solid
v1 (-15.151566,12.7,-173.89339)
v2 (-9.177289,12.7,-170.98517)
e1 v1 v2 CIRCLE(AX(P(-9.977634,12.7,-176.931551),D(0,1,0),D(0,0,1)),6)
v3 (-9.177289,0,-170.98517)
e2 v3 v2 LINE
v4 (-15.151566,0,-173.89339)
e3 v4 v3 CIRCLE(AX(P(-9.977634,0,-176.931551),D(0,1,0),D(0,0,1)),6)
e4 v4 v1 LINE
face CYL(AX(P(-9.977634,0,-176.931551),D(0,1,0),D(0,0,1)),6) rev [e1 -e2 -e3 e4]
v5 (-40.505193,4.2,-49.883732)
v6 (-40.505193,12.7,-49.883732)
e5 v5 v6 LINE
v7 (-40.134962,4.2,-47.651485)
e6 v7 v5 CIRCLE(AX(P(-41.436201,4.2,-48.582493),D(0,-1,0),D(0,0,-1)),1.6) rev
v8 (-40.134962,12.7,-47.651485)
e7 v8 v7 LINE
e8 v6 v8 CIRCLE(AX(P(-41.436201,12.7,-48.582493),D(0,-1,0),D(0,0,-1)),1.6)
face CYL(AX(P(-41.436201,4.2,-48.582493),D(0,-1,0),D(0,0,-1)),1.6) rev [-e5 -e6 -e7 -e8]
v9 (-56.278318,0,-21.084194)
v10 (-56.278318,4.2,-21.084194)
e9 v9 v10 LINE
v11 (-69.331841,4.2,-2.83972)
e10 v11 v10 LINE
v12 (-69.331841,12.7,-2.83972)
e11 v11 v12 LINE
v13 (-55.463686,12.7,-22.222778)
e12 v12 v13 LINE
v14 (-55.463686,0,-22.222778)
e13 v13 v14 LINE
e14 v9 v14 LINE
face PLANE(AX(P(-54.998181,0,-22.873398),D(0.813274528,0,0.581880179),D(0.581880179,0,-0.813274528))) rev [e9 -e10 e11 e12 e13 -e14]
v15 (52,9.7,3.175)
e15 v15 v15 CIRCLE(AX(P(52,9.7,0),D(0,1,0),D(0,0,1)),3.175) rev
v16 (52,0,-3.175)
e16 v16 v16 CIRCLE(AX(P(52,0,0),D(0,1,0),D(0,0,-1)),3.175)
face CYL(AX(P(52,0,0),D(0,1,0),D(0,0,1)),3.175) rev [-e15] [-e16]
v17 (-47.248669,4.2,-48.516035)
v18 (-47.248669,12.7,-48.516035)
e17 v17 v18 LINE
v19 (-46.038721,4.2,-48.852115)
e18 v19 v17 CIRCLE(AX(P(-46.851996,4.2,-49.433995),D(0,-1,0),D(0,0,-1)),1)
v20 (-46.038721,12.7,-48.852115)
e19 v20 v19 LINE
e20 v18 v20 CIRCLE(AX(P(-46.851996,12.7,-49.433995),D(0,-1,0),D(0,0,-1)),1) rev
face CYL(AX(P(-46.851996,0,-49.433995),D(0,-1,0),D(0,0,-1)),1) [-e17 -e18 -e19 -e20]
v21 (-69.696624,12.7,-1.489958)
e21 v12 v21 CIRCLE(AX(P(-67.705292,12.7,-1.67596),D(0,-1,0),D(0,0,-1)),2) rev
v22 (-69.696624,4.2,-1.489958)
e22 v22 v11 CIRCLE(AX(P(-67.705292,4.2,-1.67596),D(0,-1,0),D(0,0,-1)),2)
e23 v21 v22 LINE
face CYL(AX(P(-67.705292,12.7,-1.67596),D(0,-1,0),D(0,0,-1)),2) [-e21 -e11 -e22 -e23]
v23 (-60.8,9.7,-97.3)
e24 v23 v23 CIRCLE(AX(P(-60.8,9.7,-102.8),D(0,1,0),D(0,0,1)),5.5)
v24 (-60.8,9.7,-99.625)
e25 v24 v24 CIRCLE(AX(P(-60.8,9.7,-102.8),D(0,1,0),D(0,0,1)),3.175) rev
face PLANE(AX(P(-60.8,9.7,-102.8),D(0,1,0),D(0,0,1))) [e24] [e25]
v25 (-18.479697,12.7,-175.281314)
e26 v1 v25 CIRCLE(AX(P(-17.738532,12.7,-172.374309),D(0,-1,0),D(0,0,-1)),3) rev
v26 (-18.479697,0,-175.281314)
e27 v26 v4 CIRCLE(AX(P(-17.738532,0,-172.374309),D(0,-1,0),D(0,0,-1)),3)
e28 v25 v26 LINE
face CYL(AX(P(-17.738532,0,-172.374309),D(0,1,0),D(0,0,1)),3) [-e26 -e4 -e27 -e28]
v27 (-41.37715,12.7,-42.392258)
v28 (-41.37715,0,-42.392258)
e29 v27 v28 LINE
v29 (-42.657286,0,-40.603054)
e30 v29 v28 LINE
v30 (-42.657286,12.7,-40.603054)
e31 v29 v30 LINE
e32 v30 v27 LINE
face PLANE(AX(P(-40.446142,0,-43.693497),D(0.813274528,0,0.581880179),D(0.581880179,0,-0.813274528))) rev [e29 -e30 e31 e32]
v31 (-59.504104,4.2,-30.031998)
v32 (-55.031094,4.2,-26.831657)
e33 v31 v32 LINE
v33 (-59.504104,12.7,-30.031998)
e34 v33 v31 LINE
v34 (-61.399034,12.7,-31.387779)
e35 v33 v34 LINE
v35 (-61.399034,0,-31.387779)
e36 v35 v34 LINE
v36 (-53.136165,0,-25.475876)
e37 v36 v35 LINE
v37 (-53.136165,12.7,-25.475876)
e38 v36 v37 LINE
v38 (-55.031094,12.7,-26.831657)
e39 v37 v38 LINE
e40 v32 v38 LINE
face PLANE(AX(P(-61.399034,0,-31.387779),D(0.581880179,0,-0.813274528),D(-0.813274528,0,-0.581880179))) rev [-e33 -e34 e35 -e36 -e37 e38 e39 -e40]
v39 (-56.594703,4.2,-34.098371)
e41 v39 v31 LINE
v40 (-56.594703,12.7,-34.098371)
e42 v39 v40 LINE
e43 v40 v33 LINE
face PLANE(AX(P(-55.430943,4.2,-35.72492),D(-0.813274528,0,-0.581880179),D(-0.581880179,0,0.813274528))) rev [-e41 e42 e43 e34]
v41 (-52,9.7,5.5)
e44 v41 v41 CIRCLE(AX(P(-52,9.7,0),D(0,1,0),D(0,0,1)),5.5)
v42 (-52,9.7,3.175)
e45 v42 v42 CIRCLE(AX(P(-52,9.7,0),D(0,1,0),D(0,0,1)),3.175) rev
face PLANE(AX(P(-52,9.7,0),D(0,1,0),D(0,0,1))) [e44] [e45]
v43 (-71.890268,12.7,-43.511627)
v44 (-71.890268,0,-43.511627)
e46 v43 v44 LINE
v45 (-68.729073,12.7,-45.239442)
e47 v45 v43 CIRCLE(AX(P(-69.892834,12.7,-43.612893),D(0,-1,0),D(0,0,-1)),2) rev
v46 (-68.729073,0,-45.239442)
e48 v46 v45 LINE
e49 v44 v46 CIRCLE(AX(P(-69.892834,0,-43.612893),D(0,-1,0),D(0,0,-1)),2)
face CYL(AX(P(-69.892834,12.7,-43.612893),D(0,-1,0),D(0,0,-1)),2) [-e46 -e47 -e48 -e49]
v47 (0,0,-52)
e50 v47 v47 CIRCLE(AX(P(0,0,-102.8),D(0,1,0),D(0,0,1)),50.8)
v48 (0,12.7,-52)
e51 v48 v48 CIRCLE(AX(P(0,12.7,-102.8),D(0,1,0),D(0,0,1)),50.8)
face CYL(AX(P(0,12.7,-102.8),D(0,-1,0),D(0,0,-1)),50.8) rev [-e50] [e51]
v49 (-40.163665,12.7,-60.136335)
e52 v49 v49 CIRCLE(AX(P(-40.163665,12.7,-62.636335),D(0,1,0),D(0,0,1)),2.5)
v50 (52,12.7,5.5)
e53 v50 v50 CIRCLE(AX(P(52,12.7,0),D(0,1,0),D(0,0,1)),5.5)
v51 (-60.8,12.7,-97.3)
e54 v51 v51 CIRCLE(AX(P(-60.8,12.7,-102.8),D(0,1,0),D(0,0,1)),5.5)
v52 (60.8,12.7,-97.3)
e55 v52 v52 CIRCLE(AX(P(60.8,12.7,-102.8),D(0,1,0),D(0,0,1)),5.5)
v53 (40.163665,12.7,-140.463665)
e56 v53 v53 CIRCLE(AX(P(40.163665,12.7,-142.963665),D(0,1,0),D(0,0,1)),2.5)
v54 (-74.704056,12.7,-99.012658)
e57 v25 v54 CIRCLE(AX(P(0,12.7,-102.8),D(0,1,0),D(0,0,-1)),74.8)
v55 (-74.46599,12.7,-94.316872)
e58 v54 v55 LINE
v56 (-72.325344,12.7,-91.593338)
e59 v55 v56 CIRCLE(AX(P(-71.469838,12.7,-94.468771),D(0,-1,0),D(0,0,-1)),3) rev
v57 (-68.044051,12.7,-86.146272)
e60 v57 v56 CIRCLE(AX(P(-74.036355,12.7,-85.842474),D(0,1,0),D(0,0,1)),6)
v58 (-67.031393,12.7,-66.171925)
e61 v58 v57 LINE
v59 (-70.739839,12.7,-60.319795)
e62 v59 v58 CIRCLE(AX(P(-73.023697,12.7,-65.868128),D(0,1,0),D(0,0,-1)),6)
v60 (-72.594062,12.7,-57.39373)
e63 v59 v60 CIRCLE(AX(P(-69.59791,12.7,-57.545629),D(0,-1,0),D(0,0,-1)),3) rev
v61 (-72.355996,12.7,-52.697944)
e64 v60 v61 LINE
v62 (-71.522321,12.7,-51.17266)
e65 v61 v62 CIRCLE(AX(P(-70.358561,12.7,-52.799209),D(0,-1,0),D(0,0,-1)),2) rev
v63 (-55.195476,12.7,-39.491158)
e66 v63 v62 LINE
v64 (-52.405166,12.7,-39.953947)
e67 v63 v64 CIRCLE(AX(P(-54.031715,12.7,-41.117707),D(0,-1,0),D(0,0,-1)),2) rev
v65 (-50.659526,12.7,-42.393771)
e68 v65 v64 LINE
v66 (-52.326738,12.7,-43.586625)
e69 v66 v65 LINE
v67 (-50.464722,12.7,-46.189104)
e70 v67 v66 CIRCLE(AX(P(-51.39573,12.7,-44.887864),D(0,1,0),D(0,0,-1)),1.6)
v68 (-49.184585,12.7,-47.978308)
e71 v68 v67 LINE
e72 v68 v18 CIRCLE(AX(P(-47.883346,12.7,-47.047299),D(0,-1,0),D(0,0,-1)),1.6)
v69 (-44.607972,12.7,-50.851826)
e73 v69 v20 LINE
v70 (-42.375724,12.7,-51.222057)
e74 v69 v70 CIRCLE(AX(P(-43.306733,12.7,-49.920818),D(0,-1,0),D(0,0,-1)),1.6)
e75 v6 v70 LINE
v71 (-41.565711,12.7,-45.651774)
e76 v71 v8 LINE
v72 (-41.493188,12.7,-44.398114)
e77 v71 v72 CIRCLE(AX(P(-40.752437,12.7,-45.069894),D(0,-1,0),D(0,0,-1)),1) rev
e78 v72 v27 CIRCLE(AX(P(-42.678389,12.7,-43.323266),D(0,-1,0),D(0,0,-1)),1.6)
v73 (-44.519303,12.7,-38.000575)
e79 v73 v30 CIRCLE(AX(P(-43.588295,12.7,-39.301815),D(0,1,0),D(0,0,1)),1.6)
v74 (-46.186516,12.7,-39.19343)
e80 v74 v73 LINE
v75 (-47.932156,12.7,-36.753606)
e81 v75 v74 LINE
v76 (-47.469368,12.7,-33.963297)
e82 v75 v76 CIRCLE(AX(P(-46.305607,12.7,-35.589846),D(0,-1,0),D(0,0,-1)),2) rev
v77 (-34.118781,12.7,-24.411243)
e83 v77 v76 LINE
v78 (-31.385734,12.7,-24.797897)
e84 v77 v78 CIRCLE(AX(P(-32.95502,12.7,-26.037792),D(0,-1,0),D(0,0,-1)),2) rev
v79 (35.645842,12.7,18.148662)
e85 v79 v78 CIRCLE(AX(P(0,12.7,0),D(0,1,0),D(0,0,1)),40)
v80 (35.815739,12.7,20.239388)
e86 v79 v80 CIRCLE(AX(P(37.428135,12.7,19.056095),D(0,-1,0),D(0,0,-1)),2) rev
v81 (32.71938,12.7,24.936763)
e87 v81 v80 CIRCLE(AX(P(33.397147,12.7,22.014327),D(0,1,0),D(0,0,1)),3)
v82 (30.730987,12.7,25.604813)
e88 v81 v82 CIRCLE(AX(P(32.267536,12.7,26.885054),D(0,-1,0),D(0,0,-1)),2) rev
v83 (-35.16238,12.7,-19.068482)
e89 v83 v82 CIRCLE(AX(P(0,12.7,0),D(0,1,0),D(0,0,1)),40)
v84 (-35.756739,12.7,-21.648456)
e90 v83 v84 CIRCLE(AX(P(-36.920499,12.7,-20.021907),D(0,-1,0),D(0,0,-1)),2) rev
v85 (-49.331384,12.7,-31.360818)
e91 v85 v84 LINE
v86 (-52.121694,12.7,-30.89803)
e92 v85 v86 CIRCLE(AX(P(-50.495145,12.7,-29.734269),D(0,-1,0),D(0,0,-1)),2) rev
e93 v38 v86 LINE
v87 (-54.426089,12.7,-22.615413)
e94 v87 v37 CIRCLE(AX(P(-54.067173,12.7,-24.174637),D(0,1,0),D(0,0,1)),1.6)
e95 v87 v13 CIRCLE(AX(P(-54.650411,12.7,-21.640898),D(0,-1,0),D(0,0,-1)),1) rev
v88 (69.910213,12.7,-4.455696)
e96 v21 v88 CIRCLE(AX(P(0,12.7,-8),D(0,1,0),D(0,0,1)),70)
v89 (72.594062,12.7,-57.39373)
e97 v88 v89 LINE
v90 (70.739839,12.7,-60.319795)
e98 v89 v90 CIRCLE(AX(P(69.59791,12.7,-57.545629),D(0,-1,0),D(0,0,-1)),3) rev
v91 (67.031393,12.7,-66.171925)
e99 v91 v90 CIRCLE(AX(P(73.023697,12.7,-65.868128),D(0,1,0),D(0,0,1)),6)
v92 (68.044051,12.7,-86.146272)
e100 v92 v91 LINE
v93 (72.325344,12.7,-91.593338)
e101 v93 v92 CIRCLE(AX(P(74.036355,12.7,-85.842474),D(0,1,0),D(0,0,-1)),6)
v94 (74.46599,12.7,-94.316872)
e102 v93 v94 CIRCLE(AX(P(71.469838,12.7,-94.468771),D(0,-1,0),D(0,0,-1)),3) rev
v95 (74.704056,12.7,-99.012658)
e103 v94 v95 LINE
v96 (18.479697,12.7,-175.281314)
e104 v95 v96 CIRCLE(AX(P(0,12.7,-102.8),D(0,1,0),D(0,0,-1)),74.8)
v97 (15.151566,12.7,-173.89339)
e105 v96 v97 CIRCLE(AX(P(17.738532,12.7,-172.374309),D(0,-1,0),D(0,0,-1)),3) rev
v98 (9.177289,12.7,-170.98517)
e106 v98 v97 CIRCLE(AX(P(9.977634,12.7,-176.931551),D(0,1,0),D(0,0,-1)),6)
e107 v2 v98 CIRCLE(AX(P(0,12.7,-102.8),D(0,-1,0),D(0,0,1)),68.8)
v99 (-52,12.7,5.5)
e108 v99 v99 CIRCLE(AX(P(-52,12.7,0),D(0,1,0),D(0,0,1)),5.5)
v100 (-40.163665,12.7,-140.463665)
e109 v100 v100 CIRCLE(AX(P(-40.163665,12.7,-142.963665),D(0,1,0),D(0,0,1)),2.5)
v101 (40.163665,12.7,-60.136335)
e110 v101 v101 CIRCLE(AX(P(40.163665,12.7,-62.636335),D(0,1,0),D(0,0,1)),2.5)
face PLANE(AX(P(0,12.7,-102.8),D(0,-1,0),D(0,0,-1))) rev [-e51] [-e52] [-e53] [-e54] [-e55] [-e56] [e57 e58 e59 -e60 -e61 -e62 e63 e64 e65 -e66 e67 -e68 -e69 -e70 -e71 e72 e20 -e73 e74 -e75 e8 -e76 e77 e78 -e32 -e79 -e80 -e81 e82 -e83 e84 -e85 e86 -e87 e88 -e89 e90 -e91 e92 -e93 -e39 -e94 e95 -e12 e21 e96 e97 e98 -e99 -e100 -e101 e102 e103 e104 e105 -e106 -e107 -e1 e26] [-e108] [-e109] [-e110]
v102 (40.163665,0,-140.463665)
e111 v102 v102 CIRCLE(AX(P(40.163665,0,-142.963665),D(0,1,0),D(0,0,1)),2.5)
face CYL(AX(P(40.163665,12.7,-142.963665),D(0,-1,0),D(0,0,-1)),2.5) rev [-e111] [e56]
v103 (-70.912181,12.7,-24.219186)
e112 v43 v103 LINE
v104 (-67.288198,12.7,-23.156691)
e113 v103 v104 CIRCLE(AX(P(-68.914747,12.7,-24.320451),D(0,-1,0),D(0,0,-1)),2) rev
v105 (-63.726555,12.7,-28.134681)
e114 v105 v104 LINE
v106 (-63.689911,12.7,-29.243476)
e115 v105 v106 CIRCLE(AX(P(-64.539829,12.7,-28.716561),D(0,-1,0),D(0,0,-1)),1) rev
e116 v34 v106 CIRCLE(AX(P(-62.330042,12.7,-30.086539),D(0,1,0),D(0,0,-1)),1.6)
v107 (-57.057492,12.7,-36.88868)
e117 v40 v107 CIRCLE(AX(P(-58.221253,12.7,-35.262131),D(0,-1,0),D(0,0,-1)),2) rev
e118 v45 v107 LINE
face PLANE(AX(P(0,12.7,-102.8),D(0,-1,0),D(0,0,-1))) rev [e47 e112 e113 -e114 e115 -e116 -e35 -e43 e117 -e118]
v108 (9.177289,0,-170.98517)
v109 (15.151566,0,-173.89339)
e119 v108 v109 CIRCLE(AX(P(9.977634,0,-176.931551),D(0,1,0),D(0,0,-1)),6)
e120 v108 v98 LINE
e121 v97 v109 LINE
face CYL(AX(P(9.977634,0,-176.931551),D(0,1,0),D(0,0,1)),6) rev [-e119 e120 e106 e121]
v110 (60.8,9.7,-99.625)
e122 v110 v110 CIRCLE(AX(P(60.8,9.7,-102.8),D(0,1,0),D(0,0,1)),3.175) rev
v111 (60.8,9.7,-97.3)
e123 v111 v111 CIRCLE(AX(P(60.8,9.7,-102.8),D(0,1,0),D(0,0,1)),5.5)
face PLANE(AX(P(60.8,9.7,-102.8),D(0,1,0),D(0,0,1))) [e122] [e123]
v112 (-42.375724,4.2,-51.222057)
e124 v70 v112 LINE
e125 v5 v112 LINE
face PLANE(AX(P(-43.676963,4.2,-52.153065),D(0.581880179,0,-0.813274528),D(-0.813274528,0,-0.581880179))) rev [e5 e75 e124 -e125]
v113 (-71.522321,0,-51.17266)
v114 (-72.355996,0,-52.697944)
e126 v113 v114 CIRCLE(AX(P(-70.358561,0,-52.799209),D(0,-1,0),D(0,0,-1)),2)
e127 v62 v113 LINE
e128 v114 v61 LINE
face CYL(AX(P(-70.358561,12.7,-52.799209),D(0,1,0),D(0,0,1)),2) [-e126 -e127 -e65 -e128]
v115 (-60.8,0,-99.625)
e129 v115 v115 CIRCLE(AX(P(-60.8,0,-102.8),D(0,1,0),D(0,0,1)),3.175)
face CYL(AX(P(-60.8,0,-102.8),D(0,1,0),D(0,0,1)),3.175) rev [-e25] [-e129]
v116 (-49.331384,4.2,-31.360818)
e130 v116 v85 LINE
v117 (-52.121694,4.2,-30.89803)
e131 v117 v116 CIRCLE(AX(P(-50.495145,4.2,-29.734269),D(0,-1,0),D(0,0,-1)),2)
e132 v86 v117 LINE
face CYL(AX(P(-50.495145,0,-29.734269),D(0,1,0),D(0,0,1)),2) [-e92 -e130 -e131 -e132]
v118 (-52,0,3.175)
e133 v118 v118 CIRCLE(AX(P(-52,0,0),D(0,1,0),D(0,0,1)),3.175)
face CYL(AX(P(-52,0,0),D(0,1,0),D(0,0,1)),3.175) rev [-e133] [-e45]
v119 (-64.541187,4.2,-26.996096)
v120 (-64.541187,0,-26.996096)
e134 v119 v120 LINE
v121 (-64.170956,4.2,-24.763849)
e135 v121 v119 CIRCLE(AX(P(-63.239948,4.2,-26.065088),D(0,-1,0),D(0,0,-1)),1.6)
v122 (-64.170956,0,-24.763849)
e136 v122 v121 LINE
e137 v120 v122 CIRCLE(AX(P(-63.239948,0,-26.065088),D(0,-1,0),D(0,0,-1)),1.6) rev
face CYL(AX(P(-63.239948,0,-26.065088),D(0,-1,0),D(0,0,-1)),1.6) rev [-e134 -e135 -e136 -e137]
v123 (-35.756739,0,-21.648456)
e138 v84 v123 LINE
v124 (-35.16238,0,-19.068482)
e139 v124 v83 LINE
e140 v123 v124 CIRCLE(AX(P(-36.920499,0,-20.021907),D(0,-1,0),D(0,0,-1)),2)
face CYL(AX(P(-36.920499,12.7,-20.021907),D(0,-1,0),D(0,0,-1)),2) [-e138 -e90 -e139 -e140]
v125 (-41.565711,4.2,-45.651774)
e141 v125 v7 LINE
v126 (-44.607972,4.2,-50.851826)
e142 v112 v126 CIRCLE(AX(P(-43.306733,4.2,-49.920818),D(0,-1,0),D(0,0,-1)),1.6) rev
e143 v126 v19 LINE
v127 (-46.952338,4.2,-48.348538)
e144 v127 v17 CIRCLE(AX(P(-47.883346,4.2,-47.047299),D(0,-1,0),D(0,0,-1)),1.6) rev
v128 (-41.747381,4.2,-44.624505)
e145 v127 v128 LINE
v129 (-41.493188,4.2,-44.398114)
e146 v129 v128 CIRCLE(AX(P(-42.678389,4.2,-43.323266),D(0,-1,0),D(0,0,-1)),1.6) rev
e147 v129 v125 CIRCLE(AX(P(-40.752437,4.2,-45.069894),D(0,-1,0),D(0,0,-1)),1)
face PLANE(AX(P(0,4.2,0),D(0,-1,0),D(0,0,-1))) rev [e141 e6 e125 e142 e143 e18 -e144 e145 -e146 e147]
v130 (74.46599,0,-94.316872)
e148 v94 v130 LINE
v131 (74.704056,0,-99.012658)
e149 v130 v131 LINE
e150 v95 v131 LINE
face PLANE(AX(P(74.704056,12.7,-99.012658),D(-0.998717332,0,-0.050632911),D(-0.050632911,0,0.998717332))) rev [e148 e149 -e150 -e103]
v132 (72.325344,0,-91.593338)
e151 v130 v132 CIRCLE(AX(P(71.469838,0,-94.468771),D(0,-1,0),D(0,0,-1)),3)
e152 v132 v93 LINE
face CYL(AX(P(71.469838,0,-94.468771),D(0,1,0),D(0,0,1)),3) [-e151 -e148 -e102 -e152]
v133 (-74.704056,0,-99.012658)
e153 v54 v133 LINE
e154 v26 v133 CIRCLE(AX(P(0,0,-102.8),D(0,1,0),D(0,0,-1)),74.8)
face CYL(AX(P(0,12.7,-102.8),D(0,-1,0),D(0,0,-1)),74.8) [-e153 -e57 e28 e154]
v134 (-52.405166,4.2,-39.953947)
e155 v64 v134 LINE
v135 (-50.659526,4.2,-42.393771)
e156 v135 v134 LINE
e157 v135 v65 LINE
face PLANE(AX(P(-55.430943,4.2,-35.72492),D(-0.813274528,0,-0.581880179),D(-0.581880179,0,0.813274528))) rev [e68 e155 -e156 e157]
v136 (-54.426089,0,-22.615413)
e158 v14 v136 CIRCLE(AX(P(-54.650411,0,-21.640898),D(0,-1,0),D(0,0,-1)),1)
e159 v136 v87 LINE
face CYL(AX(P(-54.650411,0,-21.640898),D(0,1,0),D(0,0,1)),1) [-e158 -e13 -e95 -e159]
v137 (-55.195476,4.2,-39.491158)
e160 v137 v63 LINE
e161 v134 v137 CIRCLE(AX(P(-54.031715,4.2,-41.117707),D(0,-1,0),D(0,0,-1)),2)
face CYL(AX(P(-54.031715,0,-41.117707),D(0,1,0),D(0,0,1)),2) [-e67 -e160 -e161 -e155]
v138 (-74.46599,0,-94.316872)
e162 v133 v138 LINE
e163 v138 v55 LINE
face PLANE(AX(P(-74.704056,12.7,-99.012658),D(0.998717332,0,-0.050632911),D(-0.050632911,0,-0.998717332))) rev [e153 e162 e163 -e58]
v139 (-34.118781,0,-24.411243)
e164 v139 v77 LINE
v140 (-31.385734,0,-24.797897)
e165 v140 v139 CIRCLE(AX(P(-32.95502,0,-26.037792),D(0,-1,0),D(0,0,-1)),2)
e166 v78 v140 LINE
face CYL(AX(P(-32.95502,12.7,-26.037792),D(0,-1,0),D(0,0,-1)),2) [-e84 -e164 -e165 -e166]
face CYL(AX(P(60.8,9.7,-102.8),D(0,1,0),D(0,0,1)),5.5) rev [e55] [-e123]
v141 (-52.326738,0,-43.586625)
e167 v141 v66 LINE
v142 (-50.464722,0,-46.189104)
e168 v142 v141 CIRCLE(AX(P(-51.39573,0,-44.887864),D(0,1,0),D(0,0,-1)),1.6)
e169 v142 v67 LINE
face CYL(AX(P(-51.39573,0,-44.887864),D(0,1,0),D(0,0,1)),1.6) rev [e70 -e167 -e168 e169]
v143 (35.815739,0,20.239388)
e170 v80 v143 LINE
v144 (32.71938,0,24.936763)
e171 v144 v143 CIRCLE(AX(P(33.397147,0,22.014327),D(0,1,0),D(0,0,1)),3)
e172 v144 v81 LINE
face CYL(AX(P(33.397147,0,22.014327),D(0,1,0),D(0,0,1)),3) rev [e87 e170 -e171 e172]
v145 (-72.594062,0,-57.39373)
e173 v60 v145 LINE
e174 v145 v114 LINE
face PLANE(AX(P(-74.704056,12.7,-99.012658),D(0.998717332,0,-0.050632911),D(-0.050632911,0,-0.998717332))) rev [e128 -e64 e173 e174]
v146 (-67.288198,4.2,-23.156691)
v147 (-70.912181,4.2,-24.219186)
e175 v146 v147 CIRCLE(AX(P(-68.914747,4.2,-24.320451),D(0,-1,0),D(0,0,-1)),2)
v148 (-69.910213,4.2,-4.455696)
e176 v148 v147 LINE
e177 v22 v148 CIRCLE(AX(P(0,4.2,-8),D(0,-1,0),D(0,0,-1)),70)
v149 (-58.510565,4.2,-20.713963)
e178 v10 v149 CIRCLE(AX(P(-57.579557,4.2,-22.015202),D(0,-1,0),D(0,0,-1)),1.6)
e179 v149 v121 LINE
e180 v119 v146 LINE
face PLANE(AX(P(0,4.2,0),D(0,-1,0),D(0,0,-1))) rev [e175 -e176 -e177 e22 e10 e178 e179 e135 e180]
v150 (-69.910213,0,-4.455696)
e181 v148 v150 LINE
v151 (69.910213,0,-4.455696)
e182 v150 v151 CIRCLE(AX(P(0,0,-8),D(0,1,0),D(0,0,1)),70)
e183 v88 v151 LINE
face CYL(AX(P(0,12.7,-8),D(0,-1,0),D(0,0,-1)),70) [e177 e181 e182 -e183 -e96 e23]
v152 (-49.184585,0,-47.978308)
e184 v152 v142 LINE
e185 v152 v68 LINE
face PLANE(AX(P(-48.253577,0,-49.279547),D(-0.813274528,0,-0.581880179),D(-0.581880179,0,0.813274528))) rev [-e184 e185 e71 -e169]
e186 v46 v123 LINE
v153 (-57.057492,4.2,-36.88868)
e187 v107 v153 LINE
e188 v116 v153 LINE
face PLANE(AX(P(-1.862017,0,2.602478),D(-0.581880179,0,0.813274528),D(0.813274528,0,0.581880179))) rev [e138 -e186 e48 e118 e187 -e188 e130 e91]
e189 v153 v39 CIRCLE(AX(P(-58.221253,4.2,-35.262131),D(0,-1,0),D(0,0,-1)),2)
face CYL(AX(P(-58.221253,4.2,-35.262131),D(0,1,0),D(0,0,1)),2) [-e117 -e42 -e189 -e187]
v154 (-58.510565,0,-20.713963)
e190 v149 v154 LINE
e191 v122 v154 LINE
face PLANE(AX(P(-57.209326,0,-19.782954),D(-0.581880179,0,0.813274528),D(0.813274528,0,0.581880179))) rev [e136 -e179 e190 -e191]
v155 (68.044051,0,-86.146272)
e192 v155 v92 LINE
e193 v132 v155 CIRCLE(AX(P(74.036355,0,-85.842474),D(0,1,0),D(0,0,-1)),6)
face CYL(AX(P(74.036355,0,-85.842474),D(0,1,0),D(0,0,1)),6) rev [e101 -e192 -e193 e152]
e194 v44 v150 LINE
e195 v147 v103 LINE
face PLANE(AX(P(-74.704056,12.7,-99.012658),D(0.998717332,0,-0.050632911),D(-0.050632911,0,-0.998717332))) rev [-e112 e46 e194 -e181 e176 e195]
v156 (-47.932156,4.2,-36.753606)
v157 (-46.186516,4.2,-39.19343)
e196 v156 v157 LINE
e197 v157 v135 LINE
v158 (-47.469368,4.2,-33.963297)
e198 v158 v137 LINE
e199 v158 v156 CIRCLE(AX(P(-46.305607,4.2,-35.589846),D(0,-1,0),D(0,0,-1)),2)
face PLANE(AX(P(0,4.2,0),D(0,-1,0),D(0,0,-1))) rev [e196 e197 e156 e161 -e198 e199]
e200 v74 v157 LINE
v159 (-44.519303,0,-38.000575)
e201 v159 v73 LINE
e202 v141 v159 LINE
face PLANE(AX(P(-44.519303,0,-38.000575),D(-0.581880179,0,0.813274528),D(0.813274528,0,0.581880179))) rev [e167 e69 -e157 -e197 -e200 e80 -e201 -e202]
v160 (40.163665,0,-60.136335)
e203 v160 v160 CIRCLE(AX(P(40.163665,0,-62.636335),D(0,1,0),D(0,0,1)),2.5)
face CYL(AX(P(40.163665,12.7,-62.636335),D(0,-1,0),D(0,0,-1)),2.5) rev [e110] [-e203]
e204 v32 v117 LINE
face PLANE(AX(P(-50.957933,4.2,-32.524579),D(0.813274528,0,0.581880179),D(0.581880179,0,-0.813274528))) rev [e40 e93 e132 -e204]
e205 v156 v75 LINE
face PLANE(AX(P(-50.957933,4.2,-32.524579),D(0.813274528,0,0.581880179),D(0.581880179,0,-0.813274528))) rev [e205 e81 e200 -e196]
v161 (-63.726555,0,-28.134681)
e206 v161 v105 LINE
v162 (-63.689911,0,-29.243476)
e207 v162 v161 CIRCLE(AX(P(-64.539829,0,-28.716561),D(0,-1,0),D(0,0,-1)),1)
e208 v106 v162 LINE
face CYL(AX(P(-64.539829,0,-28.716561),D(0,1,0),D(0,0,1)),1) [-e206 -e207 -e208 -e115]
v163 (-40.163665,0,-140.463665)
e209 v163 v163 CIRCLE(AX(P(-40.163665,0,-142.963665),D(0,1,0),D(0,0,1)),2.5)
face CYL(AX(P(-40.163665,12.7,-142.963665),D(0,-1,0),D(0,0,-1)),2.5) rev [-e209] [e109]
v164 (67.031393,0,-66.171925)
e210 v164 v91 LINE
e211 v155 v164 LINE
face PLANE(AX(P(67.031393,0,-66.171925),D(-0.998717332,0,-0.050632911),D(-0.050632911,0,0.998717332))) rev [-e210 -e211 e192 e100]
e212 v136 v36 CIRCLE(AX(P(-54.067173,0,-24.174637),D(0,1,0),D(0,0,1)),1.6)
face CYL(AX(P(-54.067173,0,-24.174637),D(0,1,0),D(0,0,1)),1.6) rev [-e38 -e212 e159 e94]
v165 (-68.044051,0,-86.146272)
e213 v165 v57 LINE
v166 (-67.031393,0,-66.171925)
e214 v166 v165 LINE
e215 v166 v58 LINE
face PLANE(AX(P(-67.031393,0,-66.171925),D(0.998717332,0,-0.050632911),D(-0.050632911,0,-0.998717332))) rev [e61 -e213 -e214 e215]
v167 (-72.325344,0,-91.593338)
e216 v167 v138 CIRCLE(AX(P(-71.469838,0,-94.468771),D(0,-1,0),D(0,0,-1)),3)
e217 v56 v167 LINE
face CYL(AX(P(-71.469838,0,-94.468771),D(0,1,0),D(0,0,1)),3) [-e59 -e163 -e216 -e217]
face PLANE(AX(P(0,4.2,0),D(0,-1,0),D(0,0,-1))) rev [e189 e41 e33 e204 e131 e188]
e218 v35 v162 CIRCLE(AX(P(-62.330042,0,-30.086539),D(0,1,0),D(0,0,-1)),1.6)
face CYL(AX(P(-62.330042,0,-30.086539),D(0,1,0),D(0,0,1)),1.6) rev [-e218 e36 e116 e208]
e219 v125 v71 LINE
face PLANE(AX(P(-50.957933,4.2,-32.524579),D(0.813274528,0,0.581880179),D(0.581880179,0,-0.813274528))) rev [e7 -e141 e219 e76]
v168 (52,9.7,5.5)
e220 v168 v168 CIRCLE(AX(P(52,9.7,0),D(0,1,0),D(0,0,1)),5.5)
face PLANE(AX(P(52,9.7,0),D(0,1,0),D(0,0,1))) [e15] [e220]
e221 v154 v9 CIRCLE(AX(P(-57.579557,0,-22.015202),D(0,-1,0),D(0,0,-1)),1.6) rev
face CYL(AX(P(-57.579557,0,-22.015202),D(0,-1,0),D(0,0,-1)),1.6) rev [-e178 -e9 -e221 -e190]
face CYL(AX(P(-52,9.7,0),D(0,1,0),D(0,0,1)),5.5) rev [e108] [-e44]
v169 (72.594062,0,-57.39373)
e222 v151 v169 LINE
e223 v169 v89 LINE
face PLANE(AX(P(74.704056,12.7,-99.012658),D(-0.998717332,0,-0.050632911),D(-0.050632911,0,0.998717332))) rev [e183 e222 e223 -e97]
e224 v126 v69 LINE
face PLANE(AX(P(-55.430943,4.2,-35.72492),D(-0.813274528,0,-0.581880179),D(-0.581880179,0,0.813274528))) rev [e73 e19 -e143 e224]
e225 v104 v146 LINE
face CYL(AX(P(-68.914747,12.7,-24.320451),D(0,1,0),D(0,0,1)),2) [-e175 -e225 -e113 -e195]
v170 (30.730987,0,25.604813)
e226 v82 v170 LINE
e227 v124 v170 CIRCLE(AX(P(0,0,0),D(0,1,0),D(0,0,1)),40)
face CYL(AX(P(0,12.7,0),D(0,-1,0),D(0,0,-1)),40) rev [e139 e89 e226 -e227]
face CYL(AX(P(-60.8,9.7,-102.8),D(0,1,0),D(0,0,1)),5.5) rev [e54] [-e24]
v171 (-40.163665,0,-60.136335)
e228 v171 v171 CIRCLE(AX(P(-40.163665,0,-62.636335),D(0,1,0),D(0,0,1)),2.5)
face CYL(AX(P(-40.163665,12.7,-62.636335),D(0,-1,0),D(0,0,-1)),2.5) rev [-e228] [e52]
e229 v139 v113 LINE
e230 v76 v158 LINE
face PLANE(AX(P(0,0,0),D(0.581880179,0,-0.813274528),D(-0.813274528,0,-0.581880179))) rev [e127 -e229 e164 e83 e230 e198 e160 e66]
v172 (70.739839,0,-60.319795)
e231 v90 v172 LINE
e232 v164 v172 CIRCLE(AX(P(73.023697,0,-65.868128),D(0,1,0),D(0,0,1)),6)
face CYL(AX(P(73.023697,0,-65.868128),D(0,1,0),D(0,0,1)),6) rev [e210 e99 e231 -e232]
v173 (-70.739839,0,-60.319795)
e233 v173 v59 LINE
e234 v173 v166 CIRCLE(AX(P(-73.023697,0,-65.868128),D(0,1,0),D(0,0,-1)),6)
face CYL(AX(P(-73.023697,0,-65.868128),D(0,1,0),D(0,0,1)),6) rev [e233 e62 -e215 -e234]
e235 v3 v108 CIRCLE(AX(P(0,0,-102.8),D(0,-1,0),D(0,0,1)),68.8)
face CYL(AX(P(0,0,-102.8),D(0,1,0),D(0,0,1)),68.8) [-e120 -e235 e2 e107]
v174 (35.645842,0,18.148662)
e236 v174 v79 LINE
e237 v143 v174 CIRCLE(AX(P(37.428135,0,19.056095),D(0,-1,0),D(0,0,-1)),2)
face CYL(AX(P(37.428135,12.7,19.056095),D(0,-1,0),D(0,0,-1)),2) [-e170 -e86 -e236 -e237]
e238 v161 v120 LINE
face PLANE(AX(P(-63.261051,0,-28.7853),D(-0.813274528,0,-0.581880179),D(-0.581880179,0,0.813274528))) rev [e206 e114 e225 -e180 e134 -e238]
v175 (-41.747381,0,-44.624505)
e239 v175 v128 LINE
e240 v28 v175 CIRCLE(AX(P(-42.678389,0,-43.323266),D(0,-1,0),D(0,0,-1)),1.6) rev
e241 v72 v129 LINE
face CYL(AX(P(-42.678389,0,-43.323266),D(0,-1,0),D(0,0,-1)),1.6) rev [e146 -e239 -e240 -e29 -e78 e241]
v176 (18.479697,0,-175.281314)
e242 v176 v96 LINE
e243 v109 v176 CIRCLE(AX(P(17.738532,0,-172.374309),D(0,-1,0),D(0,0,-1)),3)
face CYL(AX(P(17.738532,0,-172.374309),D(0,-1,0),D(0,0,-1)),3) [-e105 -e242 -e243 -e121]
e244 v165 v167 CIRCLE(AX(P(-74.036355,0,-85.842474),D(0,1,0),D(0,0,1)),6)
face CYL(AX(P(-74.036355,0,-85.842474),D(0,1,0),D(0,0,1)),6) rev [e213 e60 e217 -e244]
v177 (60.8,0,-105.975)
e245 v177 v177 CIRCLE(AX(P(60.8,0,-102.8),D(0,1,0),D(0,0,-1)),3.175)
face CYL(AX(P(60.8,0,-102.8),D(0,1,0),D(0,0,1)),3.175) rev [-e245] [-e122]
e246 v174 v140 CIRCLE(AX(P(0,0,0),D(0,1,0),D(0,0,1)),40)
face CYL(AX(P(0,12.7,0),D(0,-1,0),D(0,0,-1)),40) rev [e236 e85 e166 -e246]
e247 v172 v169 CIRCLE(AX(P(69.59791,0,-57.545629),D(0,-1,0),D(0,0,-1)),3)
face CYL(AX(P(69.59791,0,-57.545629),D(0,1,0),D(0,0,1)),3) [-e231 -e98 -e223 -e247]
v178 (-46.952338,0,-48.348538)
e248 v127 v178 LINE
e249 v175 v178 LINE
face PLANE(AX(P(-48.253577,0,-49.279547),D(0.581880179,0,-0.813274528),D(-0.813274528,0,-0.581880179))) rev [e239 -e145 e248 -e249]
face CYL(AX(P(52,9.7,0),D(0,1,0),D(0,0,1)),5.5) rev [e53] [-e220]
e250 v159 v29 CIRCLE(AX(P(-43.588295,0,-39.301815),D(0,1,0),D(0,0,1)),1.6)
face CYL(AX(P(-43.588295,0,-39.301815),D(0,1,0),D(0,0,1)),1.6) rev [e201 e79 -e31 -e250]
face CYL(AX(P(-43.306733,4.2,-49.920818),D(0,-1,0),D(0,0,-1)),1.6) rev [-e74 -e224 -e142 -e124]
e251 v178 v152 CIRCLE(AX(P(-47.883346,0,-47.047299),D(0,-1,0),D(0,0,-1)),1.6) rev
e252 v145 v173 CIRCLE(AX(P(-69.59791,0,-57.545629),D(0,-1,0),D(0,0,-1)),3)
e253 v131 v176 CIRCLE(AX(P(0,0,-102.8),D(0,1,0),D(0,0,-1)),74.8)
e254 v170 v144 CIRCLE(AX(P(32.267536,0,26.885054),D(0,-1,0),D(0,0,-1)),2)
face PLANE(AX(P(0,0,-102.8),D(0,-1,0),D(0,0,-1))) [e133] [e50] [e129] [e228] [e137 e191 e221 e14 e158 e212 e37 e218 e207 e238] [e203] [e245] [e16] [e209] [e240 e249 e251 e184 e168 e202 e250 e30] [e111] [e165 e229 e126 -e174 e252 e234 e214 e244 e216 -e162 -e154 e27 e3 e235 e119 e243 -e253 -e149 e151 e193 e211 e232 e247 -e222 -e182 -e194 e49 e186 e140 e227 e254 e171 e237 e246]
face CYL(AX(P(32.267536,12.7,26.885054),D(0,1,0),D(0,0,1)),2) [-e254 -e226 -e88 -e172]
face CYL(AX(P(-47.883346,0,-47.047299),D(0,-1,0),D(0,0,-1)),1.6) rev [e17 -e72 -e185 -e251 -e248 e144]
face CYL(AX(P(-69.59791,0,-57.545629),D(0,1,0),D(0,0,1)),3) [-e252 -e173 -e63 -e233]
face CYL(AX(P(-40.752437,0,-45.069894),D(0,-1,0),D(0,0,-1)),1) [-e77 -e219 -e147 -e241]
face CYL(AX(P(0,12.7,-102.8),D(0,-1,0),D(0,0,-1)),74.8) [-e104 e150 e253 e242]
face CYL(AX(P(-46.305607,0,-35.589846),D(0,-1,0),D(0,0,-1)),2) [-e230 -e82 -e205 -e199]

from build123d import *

# Parameters (mm, degrees)
SKETCH1_R           = 40
SKETCH1_R_2         = 50.8
SKETCH1_R_3         = 2.5
BOSS_EXTRUDE1_DEPTH = 12.7
CUT_EXTRUDE1_DEPTH  = 194.127134292
CUT_EXTRUDE2_DEPTH  = 8.5
CUT_EXTRUDE3_DEPTH  = 8.5
CUT_EXTRUDE4_DEPTH  = 194.127134292
CUT_EXTRUDE5_DEPTH  = 8.5
FILLET1_R           = 2
FILLET2_R           = 2
FILLET3_R           = 1.6
FILLET4_R           = 1
SKETCH10_R          = 3.175
CUT_EXTRUDE6_DEPTH  = 194.127134292
SKETCH11_R          = 3
CUT_EXTRUDE7_DEPTH  = 194.127134292
FILLET5_R           = 2
SKETCH12_R          = 5.5
CUT_EXTRUDE8_DEPTH  = 3
CUT_EXTRUDE9_DEPTH  = 194.12713443
FILLET6_R           = 3


with BuildPart() as part:
    # Sketch1 → Boss-Extrude1 (new body)
    with BuildSketch(Plane(origin=(0, 0, 0), x_dir=(1, 0, 0), z_dir=(0, 1, 0))):
        with BuildLine():
            Line((-74.704056398, 99.012658228), (-69.910213207, 4.455696203))
            ThreePointArc((-69.910213207, 4.455696203), (0, -62), (69.910213207, 4.455696203))
            Line((69.910213207, 4.455696203), (74.704056398, 99.012658228))
            ThreePointArc((74.704056398, 99.012658228), (0, 177.6), (-74.704056398, 99.012658228))
        make_face()
        with Locations(Location((0, 0, 0), (0, 0, 270))):
            Circle(SKETCH1_R, mode=Mode.SUBTRACT)
        with Locations(Location((0, 102.8, 0), (0, 0, 270))):
            Circle(SKETCH1_R_2, mode=Mode.SUBTRACT)
        with Locations(Location((40.163665171, 142.963665171, 0), (0, 0, 270))):
            Circle(SKETCH1_R_3, mode=Mode.SUBTRACT)
        with Locations(Location((40.163665171, 62.636334829, 0), (0, 0, 270))):
            Circle(SKETCH1_R_3, mode=Mode.SUBTRACT)
        with Locations(Location((-40.163665171, 62.636334829, 0), (0, 0, 270))):
            Circle(SKETCH1_R_3, mode=Mode.SUBTRACT)
        with Locations(Location((-40.163665171, 142.963665171, 0), (0, 0, 270))):
            Circle(SKETCH1_R_3, mode=Mode.SUBTRACT)
    extrude(amount=BOSS_EXTRUDE1_DEPTH)

    # Sketch3 → Cut-Extrude1 (cut, through all)
    with BuildSketch(Plane(origin=(0, 12.7, 0), x_dir=(1, 0, 0), z_dir=(0, 1, 0))):
        Polygon((0, 0), (-72.307134802, 51.734177215), (-74.169151375, 49.131698727), (-1.862016573, -2.602478489), align=None)
    extrude(amount=-CUT_EXTRUDE1_DEPTH, mode=Mode.SUBTRACT)

    # Sketch4 → Cut-Extrude2 (cut)
    with BuildSketch(Plane(origin=(0, 12.7, 0), x_dir=(1, 0, 0), z_dir=(0, 1, 0))):
        Polygon((-55.43094311, 35.72491958), (-72.445263355, 11.944571389), (-69.985011402, 5.93106572), (-50.957933208, 32.524578595), align=None)
    extrude(amount=-CUT_EXTRUDE2_DEPTH, mode=Mode.SUBTRACT)

    # Sketch5 → Cut-Extrude3 (cut)
    with BuildSketch(Plane(origin=(0, 12.7, 0), x_dir=(1, 0, 0), z_dir=(0, 1, 0))):
        Polygon((-50.957933208, 32.524578595), (-39.203953593, 48.952724054), (-43.676963495, 52.153065038), (-55.43094311, 35.72491958), align=None)
    extrude(amount=-CUT_EXTRUDE3_DEPTH, mode=Mode.SUBTRACT)

    # Sketch6 → Cut-Extrude4 (cut, through all)
    with BuildSketch(Plane(origin=(0, 12.7, 0), x_dir=(1, 0, 0), z_dir=(0, 1, 0))):
        with BuildLine():
            Line((-61.399034012, 31.387778703), (-53.136164811, 25.475876085))
            ThreePointArc((-53.136164811, 25.475876085), (-52.765933853, 23.243628554), (-54.998181384, 22.873397596))
            Line((-54.998181384, 22.873397596), (-57.209326064, 19.782954391))
            Line((-57.209326064, 19.782954391), (-65.472195265, 25.694857009))
            Line((-65.472195265, 25.694857009), (-63.261050585, 28.785300214))
            ThreePointArc((-63.261050585, 28.785300214), (-63.631281543, 31.017547745), (-61.399034012, 31.387778703))
        make_face()
        with BuildLine():
            Line((-48.253577172, 49.279546767), (-40.446141706, 43.693497049))
            Line((-40.446141706, 43.693497049), (-42.657286386, 40.603053844))
            ThreePointArc((-42.657286386, 40.603053844), (-42.287055428, 38.370806313), (-44.519302959, 38.000575355))
            Line((-44.519302959, 38.000575355), (-52.326738425, 43.586625073))
            ThreePointArc((-52.326738425, 43.586625073), (-52.696969382, 45.818872604), (-50.464721852, 46.189103562))
            Line((-50.464721852, 46.189103562), (-48.253577172, 49.279546767))
        make_face()
    extrude(amount=-CUT_EXTRUDE4_DEPTH, mode=Mode.SUBTRACT)

    # Sketch7 → Cut-Extrude5 (cut)
    with BuildSketch(Plane(origin=(0, 12.7, 0), x_dir=(1, 0, 0), z_dir=(0, 1, 0))):
        Polygon((-57.209326064, 19.782954391), (-69.762440014, 2.237885514), (-73.208758404, 10.192307077), (-70.622080139, 18.497034605), (-65.472195265, 25.694857009), align=None)
    extrude(amount=-CUT_EXTRUDE5_DEPTH, mode=Mode.SUBTRACT)

    # Fillet1
    fillet1_edges = [part.edges().sort_by_distance(p)[0] for p in [
        (-32.530981106, 6.35, -23.275207158),
        (-34.288731446, 6.35, -20.598128455),
        (-72.100144873, 6.35, -47.65136972),
        (-72.307134802, 6.35, -51.734177215),
    ]]
    fillet(fillet1_edges, radius=FILLET1_R)

    # Fillet2
    fillet2_edges = [part.edges().sort_by_distance(p)[0] for p in [
        (-70.622080139, 8.45, -18.497034605),
        (-69.762440014, 8.45, -2.237885514),
        (-55.43094311, 8.45, -35.72491958),
        (-50.957933208, 8.45, -32.524578595),
        (-53.568926538, 8.45, -38.327398068),
        (-49.095916635, 8.45, -35.127057084),
    ]]
    fillet(fillet2_edges, radius=FILLET2_R)

    # Fillet3
    fillet3_edges = [part.edges().sort_by_distance(p)[0] for p in [
        (-57.209326064, 2.1, -19.782954391),
        (-65.472195265, 2.1, -25.694857009),
        (-48.253577172, 6.35, -49.279546767),
        (-40.446141706, 6.35, -43.693497049),
        (-39.203953593, 8.45, -48.952724054),
        (-43.676963495, 8.45, -52.153065038),
    ]]
    fillet(fillet3_edges, radius=FILLET3_R)

    # Fillet4
    # the kernel refuses this fillet: 1 mm, written as the material it takes off along each edge
    with BuildSketch(Plane(origin=(-54.998181384, 14.7, -22.873397596), x_dir=(0.9115973776641382, 0, 0.41108420188066924), z_dir=(0, -1, 0))) as fillet4_piece_1:
        with BuildLine():
            CenterArc((0.823687768, 0.980580676), FILLET4_R, 191.309932474, 67.380135052)
            Line((-0.156892908, 0.784464541), (0, 0))
            ThreePointArc((0, 0), (0.313785816, 0.031070919), (0.627571632, 0))
        make_face()
    extrude(amount=16.7, mode=Mode.SUBTRACT)
    with BuildSketch(Plane(origin=(-63.261050585, 14.7, -28.785300214), x_dir=(-0.6833651940435568, 0, -0.7300767162222146), z_dir=(0, -1, 0))) as fillet4_piece_2:
        with BuildLine():
            CenterArc((0.823687768, -0.980580676), FILLET4_R, 101.309932474, 67.380135052)
            Line((-0.156892908, -0.784464541), (0, 0))
            ThreePointArc((0, 0), (0.313785816, -0.031070919), (0.627571632, 0))
        make_face()
    extrude(amount=16.7, mode=Mode.SUBTRACT)
    with BuildSketch(Plane(origin=(-42.113354488, 15.05290288, -44.886351416), x_dir=(0.5818801789556023, 0, -0.8132745276587705), z_dir=(0, -1, 0)), Plane(origin=(-46.58636439, 4.2, -48.0866924), x_dir=(0.5818801789556058, 0, -0.813274527658768), z_dir=(0, 1, 0))) as fillet4_piece_3:
        with BuildLine():
            CenterArc((0.941161152, 1), FILLET4_R, 192.212525269, 77.787474731)
            Line((-0.036208522, 0.788461538), (-0.133945489, 0.767307692))
            ThreePointArc((-0.133945489, 0.767307692), (-0.1, 0.45), (-0.1, 0))
            Line((-0.1, 0), (0, -0.1))
            Line((0, -0.1), (0.941161152, -0.1))
            Line((0.941161152, -0.1), (0.941161152, 0))
        make_face()
    extrude(amount=10.85290288, mode=Mode.SUBTRACT)

    # Sketch10 → Cut-Extrude6 (cut, through all)
    with BuildSketch(Plane(origin=(0, 12.7, 0), x_dir=(1, 0, 0), z_dir=(0, 1, 0))):
        with Locations(Location((-52, 0, 0), (0, 0, 270))):
            Circle(SKETCH10_R)
        with Locations(Location((-60.8, 102.8, 0), (0, 0, 270))):
            Circle(SKETCH10_R)
        with Locations(Location((60.8, 102.8, 0), (0, 0, 90))):
            Circle(SKETCH10_R)
        with Locations(Location((52, 0, 0), (0, 0, 90))):
            Circle(SKETCH10_R)
    extrude(amount=-CUT_EXTRUDE6_DEPTH, mode=Mode.SUBTRACT)

    # Sketch11 → Cut-Extrude7 (cut, through all)
    with BuildSketch(Plane(origin=(0, 12.7, 0), x_dir=(1, 0, 0), z_dir=(0, 1, 0))):
        with Locations((33.397146804, -22.01432682)):
            Circle(SKETCH11_R)
    extrude(amount=-CUT_EXTRUDE7_DEPTH, mode=Mode.SUBTRACT)

    # Fillet5
    fillet5_edges = [part.edges().sort_by_distance(p)[0] for p in [
        (34.95313052, 6.35, 19.449387313),
        (31.653304138, 6.35, 24.455435739),
    ]]
    fillet(fillet5_edges, radius=FILLET5_R)

    # Sketch12 → Cut-Extrude8 (cut)
    with BuildSketch(Plane(origin=(0, 12.7, 0), x_dir=(1, 0, 0), z_dir=(0, 1, 0))):
        with Locations(Location((-60.8, 102.8, 0), (0, 0, 270))):
            Circle(SKETCH12_R)
        with Locations(Location((60.8, 102.8, 0), (0, 0, 270))):
            Circle(SKETCH12_R)
        with Locations(Location((52, 0, 0), (0, 0, 270))):
            Circle(SKETCH12_R)
        with Locations(Location((-52, 0, 0), (0, 0, 270))):
            Circle(SKETCH12_R)
    extrude(amount=-CUT_EXTRUDE8_DEPTH, mode=Mode.SUBTRACT)

    # Sketch13 → Cut-Extrude9 (cut, through all)
    with BuildSketch(Plane(origin=(0, 12.7, 0), x_dir=(1, 0, 0), z_dir=(0, 1, 0))):
        with BuildLine():
            Line((-67.031392983, 66.171925083), (-68.044051211, 86.146271714))
            ThreePointArc((-68.044051211, 86.146271714), (-74.340152668, 91.834778235), (-80.028659189, 85.538676777))
            Line((-80.028659189, 85.538676777), (-79.016000961, 65.564330147))
            ThreePointArc((-79.016000961, 65.564330147), (-72.719899504, 59.875823626), (-67.031392983, 66.171925083))
        make_face()
        with BuildLine():
            Line((67.031392983, 66.171925083), (68.044051211, 86.146271714))
            ThreePointArc((68.044051211, 86.146271714), (74.340152668, 91.834778235), (80.028659189, 85.538676777))
            Line((80.028659189, 85.538676777), (79.016000961, 65.564330147))
            ThreePointArc((79.016000961, 65.564330147), (72.719899504, 59.875823626), (67.031392983, 66.171925083))
        make_face()
        with BuildLine():
            ThreePointArc((10.777978726, 182.877931883), (0, 183.6), (-10.777978726, 182.877931883))
            ThreePointArc((-10.777978726, 182.877931883), (-15.924014851, 176.131205847), (-9.177288816, 170.985169722))
            ThreePointArc((-9.177288816, 170.985169722), (0, 171.6), (9.177288816, 170.985169722))
            ThreePointArc((9.177288816, 170.985169722), (15.924014851, 176.131205847), (10.777978726, 182.877931883))
        make_face()
    extrude(amount=-CUT_EXTRUDE9_DEPTH, mode=Mode.SUBTRACT)

    # Fillet6
    fillet6_edges = [part.edges().sort_by_distance(p)[0] for p in [
        (-74.340152668, 6.35, -91.834778235),
        (-72.719899504, 6.35, -59.875823626),
        (74.340152668, 6.35, -91.834778235),
        (72.719899504, 6.35, -59.875823626),
        (-15.887130952, 6.35, -175.893358591),
        (15.887130952, 6.35, -175.893358591),
    ]]
    fillet(fillet6_edges, radius=FILLET6_R)


solid = part.part
